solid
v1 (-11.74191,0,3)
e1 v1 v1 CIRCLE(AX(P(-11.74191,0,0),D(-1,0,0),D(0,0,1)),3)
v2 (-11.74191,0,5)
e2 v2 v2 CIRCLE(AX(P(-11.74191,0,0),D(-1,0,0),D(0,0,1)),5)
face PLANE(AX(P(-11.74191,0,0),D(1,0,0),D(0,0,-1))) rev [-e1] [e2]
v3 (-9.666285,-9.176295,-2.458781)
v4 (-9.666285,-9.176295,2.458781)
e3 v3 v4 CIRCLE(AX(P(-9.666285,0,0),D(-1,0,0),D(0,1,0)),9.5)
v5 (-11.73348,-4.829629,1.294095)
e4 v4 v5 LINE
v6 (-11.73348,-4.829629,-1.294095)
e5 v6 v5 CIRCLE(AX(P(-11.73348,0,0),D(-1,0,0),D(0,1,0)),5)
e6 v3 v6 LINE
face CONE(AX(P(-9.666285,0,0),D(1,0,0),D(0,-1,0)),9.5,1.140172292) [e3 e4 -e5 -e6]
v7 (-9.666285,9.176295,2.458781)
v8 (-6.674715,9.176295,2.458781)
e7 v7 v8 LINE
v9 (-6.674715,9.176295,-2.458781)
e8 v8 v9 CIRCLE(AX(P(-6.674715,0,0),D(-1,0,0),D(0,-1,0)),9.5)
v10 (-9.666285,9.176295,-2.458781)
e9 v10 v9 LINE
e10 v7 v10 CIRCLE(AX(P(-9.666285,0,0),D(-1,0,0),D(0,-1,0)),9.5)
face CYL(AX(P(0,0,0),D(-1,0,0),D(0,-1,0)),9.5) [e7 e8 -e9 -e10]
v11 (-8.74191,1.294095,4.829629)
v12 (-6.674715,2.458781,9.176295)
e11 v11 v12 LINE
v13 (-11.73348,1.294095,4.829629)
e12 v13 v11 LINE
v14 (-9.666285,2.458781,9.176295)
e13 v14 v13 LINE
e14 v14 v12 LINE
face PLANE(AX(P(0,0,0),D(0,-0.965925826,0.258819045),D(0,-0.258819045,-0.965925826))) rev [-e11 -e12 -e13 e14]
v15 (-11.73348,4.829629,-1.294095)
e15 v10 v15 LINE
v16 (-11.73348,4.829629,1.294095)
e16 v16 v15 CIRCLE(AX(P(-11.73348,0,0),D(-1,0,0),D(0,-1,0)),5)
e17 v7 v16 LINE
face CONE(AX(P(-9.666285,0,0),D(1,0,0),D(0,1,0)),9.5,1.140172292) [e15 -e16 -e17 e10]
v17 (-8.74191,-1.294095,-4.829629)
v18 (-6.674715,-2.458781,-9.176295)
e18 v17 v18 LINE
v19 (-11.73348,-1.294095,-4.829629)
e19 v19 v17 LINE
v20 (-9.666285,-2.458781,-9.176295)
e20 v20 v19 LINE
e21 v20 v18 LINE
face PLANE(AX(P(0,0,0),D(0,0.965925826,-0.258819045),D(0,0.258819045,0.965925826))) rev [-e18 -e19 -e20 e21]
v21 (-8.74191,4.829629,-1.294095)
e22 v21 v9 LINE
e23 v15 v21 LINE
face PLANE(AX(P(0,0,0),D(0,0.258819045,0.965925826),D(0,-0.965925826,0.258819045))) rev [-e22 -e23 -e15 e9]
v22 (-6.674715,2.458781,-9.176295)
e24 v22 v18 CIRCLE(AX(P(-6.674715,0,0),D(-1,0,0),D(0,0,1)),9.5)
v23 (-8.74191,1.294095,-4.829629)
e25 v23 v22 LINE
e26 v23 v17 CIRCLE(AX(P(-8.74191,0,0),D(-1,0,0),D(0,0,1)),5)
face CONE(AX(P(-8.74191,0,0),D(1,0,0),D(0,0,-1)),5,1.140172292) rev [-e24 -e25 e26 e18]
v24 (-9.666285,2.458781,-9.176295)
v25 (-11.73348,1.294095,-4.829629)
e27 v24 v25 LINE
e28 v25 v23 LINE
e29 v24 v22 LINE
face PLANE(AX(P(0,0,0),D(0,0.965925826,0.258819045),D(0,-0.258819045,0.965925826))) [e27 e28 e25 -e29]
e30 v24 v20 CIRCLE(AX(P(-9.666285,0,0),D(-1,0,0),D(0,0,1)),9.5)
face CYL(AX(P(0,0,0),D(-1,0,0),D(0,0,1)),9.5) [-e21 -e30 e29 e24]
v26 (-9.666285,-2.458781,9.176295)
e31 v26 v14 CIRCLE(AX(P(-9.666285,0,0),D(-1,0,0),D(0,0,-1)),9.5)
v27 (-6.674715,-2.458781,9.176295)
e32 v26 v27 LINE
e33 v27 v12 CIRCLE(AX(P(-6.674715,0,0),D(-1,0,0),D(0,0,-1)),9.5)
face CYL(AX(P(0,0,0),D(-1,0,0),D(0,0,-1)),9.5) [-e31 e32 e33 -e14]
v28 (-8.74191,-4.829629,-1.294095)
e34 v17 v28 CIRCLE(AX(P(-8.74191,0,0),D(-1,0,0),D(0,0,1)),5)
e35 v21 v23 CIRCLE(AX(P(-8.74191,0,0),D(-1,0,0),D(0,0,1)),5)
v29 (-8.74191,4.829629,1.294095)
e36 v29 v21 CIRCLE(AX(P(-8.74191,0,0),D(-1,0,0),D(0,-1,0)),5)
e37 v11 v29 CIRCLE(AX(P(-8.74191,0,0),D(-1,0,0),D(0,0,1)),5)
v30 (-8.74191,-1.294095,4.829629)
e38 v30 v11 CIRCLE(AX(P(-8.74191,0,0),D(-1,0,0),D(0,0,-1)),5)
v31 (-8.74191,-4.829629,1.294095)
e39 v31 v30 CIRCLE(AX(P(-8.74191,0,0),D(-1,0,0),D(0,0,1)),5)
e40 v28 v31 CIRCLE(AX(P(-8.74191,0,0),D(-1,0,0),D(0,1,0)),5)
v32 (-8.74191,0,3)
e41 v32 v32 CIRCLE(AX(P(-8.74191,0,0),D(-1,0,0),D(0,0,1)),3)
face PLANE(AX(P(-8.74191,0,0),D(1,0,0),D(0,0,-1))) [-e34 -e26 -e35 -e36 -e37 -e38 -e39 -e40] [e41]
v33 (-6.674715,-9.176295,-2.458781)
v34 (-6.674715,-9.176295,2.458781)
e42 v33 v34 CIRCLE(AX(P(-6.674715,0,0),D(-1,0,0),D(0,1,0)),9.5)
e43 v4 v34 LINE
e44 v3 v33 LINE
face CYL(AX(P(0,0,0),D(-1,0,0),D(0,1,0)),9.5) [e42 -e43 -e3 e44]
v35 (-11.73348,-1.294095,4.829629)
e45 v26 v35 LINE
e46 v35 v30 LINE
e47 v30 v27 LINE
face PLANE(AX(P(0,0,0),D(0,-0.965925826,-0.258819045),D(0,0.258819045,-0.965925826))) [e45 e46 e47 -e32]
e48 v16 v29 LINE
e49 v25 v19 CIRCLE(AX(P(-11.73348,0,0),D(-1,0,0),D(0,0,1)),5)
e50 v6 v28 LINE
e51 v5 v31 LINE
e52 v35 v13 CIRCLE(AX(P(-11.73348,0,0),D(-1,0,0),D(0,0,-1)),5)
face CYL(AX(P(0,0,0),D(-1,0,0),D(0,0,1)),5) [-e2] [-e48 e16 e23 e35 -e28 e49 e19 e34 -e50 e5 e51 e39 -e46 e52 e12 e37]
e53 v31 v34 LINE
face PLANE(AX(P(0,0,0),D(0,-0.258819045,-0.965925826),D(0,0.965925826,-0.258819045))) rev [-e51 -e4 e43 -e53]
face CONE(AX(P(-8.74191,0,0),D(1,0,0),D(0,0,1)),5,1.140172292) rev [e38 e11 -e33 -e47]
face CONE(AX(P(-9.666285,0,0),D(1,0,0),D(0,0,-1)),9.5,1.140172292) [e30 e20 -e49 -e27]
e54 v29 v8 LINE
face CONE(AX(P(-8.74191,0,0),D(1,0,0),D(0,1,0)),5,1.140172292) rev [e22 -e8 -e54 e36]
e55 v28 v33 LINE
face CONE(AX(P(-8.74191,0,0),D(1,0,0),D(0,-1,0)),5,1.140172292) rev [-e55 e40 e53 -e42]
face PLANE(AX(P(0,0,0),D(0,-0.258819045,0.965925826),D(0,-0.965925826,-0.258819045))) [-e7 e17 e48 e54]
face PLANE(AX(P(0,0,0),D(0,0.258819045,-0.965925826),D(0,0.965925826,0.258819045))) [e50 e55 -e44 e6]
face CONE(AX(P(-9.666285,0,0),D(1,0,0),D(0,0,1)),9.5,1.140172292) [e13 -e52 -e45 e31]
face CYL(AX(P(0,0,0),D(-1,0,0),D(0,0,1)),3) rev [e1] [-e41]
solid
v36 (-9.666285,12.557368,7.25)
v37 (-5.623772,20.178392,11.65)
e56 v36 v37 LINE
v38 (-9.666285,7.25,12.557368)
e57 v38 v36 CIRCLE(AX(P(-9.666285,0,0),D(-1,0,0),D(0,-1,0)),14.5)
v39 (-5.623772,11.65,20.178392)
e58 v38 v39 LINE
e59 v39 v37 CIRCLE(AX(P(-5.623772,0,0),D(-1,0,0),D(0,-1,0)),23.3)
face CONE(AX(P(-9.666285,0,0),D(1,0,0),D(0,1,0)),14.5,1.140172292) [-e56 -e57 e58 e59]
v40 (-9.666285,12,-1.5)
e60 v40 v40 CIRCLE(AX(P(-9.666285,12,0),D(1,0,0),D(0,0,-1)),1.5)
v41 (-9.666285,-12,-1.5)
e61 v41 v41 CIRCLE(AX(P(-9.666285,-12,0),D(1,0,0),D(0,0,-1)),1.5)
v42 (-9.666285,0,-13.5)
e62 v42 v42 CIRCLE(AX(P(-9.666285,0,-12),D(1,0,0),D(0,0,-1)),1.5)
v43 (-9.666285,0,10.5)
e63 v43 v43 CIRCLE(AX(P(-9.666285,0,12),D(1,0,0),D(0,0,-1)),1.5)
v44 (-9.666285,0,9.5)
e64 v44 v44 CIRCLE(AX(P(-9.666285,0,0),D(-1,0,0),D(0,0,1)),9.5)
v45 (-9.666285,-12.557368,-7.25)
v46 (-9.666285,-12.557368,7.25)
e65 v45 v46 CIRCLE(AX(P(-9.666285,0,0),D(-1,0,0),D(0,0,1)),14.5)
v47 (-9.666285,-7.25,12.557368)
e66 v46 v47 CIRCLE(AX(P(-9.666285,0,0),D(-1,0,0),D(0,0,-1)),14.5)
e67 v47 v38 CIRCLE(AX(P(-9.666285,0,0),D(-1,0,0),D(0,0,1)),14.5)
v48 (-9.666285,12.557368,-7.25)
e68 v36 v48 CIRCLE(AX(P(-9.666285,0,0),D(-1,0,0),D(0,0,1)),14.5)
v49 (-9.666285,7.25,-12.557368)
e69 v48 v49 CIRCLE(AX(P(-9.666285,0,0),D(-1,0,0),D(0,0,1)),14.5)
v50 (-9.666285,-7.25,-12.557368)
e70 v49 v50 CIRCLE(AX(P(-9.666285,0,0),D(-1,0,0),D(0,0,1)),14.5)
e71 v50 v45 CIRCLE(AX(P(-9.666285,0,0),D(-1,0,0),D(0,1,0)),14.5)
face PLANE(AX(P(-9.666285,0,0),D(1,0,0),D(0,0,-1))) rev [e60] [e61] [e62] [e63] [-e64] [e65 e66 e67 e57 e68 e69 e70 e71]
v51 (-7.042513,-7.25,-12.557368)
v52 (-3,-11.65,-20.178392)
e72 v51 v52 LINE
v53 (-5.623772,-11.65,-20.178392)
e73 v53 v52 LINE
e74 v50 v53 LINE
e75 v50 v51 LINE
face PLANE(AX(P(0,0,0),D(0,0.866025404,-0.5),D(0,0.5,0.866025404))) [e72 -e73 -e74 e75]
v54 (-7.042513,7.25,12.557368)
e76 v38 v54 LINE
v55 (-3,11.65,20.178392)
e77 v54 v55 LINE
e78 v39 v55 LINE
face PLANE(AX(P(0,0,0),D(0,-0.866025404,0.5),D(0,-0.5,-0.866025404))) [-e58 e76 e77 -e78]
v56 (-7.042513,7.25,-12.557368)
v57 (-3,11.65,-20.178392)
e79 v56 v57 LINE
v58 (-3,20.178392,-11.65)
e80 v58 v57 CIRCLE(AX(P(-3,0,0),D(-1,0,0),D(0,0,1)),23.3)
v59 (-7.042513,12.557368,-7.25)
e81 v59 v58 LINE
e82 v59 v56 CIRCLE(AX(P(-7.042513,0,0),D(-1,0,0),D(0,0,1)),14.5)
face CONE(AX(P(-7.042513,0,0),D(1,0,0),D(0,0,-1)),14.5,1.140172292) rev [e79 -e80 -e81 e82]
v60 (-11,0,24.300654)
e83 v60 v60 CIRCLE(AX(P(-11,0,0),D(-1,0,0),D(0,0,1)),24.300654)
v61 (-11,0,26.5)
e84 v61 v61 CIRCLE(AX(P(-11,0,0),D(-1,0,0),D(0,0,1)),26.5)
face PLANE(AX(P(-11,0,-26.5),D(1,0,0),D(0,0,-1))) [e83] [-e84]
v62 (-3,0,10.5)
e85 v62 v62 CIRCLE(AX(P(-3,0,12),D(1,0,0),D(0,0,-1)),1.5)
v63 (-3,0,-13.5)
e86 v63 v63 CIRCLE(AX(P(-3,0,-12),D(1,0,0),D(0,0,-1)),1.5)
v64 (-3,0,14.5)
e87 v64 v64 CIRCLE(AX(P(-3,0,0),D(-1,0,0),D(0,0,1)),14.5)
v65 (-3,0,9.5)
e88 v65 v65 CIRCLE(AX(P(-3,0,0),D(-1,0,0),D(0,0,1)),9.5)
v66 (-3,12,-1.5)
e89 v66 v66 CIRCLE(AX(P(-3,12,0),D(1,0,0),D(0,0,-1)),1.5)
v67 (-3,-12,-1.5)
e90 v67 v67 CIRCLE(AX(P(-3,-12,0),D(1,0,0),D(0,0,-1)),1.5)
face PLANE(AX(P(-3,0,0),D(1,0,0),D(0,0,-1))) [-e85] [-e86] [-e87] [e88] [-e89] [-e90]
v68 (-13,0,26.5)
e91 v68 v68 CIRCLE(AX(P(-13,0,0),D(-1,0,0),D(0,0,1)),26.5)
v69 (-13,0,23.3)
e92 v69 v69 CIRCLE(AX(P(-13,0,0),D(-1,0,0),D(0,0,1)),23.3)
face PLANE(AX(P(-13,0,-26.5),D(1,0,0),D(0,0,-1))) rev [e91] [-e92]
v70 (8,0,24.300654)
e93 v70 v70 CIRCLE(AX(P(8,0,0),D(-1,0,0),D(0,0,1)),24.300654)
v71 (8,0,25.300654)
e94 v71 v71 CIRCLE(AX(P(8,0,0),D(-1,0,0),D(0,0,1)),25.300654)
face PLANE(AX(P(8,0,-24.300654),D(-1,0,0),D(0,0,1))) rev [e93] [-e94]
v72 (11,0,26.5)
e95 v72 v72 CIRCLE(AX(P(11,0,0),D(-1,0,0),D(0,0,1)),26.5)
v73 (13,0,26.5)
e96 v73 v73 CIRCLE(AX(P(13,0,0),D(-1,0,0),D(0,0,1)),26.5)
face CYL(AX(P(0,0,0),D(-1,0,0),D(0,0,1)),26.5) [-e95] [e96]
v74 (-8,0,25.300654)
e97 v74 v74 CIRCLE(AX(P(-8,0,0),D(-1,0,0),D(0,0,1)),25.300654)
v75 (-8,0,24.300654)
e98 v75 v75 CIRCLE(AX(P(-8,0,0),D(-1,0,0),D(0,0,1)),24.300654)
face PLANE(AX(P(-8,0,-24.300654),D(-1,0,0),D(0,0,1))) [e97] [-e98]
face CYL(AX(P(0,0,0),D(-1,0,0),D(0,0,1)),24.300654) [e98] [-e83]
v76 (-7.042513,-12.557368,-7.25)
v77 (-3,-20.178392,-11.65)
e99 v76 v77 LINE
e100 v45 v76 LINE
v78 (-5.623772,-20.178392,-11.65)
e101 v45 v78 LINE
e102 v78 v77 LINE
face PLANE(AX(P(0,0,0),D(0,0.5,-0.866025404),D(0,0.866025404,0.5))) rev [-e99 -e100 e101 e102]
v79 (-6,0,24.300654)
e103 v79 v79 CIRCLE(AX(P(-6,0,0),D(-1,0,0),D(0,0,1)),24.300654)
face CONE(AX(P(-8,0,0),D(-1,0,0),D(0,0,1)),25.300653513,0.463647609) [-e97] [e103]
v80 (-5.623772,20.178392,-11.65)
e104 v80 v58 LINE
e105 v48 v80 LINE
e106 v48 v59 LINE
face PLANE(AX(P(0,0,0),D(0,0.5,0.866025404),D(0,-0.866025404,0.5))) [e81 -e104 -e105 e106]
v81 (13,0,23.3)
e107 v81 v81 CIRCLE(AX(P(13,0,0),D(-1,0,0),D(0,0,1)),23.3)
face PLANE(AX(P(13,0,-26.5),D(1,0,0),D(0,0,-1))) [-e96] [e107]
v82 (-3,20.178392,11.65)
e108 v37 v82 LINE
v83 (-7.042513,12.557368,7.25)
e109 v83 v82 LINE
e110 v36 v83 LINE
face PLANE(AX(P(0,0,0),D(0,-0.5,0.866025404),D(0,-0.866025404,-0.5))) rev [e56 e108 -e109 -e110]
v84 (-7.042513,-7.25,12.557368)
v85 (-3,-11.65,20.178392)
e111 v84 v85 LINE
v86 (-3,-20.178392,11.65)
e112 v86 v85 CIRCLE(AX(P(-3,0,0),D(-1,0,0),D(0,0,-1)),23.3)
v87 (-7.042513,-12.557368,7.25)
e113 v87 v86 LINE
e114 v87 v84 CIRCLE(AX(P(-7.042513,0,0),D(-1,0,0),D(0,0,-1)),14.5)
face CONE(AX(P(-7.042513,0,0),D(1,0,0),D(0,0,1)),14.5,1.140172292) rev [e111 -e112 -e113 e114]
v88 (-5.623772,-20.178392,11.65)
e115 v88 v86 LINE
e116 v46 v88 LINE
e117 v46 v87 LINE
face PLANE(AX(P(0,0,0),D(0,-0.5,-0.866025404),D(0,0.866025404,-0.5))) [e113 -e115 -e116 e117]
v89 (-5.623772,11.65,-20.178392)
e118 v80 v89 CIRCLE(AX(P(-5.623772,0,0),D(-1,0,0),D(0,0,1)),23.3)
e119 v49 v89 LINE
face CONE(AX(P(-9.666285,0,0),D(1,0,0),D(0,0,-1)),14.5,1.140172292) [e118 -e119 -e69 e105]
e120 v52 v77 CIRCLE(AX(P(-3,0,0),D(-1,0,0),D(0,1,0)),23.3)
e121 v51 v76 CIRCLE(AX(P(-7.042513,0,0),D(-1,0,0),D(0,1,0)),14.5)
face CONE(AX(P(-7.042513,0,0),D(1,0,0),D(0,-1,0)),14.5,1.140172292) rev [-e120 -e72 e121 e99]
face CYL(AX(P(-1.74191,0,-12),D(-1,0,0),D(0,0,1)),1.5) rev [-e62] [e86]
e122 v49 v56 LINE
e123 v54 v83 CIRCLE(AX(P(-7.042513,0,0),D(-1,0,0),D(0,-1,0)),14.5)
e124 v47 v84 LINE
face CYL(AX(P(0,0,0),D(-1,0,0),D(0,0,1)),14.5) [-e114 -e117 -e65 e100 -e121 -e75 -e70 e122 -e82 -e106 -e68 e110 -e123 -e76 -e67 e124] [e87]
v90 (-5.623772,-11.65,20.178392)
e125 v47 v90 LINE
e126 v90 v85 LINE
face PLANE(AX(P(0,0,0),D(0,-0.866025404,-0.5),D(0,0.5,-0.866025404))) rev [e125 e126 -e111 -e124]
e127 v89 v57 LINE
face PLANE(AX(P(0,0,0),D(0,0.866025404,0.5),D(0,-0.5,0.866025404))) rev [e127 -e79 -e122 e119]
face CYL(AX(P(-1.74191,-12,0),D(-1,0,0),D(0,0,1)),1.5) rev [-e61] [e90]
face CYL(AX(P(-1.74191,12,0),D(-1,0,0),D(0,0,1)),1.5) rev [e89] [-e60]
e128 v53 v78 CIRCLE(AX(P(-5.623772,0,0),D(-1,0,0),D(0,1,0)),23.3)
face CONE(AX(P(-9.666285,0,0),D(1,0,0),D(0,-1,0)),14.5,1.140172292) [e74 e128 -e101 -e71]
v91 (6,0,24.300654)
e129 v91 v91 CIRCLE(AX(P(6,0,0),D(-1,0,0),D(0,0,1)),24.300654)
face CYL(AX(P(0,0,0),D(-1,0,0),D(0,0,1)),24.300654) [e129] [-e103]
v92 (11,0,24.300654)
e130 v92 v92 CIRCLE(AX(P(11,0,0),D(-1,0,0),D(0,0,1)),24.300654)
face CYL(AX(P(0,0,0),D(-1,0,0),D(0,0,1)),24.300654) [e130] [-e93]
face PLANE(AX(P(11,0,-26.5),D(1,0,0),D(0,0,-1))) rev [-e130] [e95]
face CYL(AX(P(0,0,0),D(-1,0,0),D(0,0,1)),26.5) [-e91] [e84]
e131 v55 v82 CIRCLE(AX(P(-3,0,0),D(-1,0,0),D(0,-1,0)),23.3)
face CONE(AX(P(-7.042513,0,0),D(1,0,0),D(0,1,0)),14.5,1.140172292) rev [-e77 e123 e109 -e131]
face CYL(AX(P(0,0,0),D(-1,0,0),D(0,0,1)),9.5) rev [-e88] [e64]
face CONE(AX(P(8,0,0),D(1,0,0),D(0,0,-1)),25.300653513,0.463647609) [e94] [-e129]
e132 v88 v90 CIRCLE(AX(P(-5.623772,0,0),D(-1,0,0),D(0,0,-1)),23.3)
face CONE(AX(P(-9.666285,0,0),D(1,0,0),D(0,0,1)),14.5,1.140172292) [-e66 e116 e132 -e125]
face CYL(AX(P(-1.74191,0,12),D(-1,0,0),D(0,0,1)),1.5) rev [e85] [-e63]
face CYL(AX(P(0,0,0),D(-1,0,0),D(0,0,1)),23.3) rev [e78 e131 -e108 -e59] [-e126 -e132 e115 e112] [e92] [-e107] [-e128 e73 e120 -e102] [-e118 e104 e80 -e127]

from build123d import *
from build123d.topology import SkipClean

# Parameters (mm, degrees)
REVOLVE_3_ANGLE          = 60
PATTERN_CIRCULAR_3_COUNT = 4
REVOLVE_5_ANGLE          = 30
PATTERN_CIRCULAR_2_COUNT = 4
CUT_REVOLVE_1_ANGLE      = 30
PATTERN_CIRCULAR_4_COUNT = 4
CUT_EXTRUDE_1_DEPTH      = 10
PATTERN_CIRCULAR_5_COUNT = 4


# Read off the part's stored shape, not the designer's step: 旋转5
with BuildPart() as part:
    # 草图4 → 旋转1 (revolve)
    with BuildSketch(Plane(origin=(0, 0, 0), x_dir=(1, 0, 0), z_dir=(0, 1, 0)), mode=Mode.PRIVATE) as revolve_1_sk:
        Polygon((-13, 26.5), (-11, 26.5), (-11, 24.300653513), (-8, 24.300653513), (-8, 25.300653513), (-6, 24.300653513), (6, 24.300653513), (8, 25.300653513), (8, 24.300653513), (11, 24.300653513), (11, 26.5), (13, 26.5), (13, 23.3), (-13, 23.3), align=None)
    revolve(revolve_1_sk.sketch.rotate(Axis((0, 0, 0), (1, 0, 0)), 180), axis=Axis((0, 0, 0), (1, 0, 0)))



with BuildPart() as body_2:
    # 草图4<3> → 旋转2 (revolve)
    with BuildSketch(Plane(origin=(0, 0, 0), x_dir=(1, 0, 0), z_dir=(0, 1, 0)), mode=Mode.PRIVATE) as revolve_2_sk:
        Polygon((-7.042513466, 14.5), (-9.666285329, 14.5), (-9.666285329, 9.5), (-7.042513466, 9.5), (-6.674715481, 9.5), (-3, 9.5), (-3, 12), (-3, 14.5), align=None)
    revolve(revolve_2_sk.sketch.rotate(Axis((0, 0, 0), (1, 0, 0)), 180), axis=Axis((0, 0, 0), (1, 0, 0)))


with BuildPart() as part_1:
    add(part.part)

    add(body_2.part)  # 旋转3 merges body 2
    # 草图4<4> → 旋转3 (revolve)
    with BuildSketch(Plane(origin=(0, 0, 0), x_dir=(1, 0, 0), z_dir=(0, 1, 0))):
        Polygon((-3, 23.3), (-5.623771863, 23.3), (-9.666285329, 14.5), (-7.042513466, 14.5), align=None)
    revolve_3 = revolve(axis=Axis((0, 0, 0), (1, 0, 0)), revolution_arc=REVOLVE_3_ANGLE)

    # 阵列(圆周)3: 旋转3 ×4 about axis
    pattern_circular_3_axis = Axis((-9.666285329, 0, 0), (-1, 0, 0))
    for i in range(1, PATTERN_CIRCULAR_3_COUNT):
        add(revolve_3.rotate(pattern_circular_3_axis, i * 360 / PATTERN_CIRCULAR_3_COUNT))

    # 草图4<7> → 切除-旋转1 (revolve, cut)
    with SkipClean():  # the faces are left unmerged after this step: merging them gives an invalid solid
        with BuildSketch(Plane(origin=(0, 0, 0), x_dir=(1, 0, 0), z_dir=(0, 1, 0))):
            Polygon((-3, 23.3), (-5.623771863, 23.3), (-9.666285329, 14.5), (-7.042513466, 14.5), align=None)
        cut_revolve_1 = revolve(axis=Axis((0, 0, 0), (1, 0, 0)), revolution_arc=CUT_REVOLVE_1_ANGLE, mode=Mode.SUBTRACT)

    # 阵列(圆周)4: 切除-旋转1 ×4 about axis
    with SkipClean():  # the faces are left unmerged after this step: merging them gives an invalid solid
        pattern_circular_4_axis = Axis((-9.666285329, 0, 0), (-1, 0, 0))
        for i in range(1, PATTERN_CIRCULAR_4_COUNT):
            add(cut_revolve_1.rotate(pattern_circular_4_axis, i * 360 / PATTERN_CIRCULAR_4_COUNT), mode=Mode.SUBTRACT)

    # 草图6 → 切除-拉伸1 (cut)
    with SkipClean():  # the faces are left unmerged after this step: merging them gives an invalid solid
        with BuildSketch(Plane.ZY.offset(11.741909867)):
            with BuildLine():
                ThreePointArc((-13.5, 0), (-12, -1.5), (-10.5, 0))
                Line((-10.5, 0), (-12, 0))
                Line((-12, 0), (-13.5, 0))
            make_face()
            with BuildLine():
                Line((-12, 0), (-10.5, 0))
                ThreePointArc((-10.5, 0), (-12, 1.5), (-13.5, 0))
                Line((-13.5, 0), (-12, 0))
            make_face()
        cut_extrude_1 = extrude(amount=-CUT_EXTRUDE_1_DEPTH, mode=Mode.SUBTRACT)

    # 阵列(圆周)5: 切除-拉伸1 ×4 about axis
    with SkipClean():  # the faces are left unmerged after this step: merging them gives an invalid solid
        pattern_circular_5_axis = Axis((0, 0, 0), (1, 0, 0))
        for i in range(1, PATTERN_CIRCULAR_5_COUNT):
            add(cut_extrude_1.rotate(pattern_circular_5_axis, i * 360 / PATTERN_CIRCULAR_5_COUNT), mode=Mode.SUBTRACT)


with BuildPart() as body_2_2:
    # 草图4<5> → 旋转4 (revolve)
    with BuildSketch(Plane(origin=(0, 0, 0), x_dir=(1, 0, 0), z_dir=(0, 1, 0)), mode=Mode.PRIVATE) as revolve_4_sk:
        Polygon((-8.741909867, 5), (-11.733479715, 5), (-11.741909867, 5), (-11.741909867, 3), (-8.741909867, 3), align=None)
    revolve(revolve_4_sk.sketch.rotate(Axis((0, 0, 0), (1, 0, 0)), 180), axis=Axis((0, 0, 0), (1, 0, 0)))

    # 旋转5 outline → 旋转5 (revolve)
    with BuildSketch(Plane(origin=(0, 0, 0), x_dir=(0, -0.25881904510252235, -0.9659258262890679), z_dir=(0, -0.9659258262890679, 0.25881904510252235))):
        Polygon((9.5, -6.674715481), (5, -8.741909867), (5, -11.733479715), (9.5, -9.666285329), align=None)
    revolve_5 = revolve(axis=Axis((0, 0, 0), (1, 0, 0)), revolution_arc=REVOLVE_5_ANGLE)

    # 阵列(圆周)2: 旋转5 ×4 about axis
    pattern_circular_2_axis = Axis((-11.741909867, 0, 0), (-1, 0, 0))
    for i in range(1, PATTERN_CIRCULAR_2_COUNT):
        add(revolve_5.rotate(pattern_circular_2_axis, i * 360 / PATTERN_CIRCULAR_2_COUNT))


solid = Compound([part_1.part, body_2_2.part])
